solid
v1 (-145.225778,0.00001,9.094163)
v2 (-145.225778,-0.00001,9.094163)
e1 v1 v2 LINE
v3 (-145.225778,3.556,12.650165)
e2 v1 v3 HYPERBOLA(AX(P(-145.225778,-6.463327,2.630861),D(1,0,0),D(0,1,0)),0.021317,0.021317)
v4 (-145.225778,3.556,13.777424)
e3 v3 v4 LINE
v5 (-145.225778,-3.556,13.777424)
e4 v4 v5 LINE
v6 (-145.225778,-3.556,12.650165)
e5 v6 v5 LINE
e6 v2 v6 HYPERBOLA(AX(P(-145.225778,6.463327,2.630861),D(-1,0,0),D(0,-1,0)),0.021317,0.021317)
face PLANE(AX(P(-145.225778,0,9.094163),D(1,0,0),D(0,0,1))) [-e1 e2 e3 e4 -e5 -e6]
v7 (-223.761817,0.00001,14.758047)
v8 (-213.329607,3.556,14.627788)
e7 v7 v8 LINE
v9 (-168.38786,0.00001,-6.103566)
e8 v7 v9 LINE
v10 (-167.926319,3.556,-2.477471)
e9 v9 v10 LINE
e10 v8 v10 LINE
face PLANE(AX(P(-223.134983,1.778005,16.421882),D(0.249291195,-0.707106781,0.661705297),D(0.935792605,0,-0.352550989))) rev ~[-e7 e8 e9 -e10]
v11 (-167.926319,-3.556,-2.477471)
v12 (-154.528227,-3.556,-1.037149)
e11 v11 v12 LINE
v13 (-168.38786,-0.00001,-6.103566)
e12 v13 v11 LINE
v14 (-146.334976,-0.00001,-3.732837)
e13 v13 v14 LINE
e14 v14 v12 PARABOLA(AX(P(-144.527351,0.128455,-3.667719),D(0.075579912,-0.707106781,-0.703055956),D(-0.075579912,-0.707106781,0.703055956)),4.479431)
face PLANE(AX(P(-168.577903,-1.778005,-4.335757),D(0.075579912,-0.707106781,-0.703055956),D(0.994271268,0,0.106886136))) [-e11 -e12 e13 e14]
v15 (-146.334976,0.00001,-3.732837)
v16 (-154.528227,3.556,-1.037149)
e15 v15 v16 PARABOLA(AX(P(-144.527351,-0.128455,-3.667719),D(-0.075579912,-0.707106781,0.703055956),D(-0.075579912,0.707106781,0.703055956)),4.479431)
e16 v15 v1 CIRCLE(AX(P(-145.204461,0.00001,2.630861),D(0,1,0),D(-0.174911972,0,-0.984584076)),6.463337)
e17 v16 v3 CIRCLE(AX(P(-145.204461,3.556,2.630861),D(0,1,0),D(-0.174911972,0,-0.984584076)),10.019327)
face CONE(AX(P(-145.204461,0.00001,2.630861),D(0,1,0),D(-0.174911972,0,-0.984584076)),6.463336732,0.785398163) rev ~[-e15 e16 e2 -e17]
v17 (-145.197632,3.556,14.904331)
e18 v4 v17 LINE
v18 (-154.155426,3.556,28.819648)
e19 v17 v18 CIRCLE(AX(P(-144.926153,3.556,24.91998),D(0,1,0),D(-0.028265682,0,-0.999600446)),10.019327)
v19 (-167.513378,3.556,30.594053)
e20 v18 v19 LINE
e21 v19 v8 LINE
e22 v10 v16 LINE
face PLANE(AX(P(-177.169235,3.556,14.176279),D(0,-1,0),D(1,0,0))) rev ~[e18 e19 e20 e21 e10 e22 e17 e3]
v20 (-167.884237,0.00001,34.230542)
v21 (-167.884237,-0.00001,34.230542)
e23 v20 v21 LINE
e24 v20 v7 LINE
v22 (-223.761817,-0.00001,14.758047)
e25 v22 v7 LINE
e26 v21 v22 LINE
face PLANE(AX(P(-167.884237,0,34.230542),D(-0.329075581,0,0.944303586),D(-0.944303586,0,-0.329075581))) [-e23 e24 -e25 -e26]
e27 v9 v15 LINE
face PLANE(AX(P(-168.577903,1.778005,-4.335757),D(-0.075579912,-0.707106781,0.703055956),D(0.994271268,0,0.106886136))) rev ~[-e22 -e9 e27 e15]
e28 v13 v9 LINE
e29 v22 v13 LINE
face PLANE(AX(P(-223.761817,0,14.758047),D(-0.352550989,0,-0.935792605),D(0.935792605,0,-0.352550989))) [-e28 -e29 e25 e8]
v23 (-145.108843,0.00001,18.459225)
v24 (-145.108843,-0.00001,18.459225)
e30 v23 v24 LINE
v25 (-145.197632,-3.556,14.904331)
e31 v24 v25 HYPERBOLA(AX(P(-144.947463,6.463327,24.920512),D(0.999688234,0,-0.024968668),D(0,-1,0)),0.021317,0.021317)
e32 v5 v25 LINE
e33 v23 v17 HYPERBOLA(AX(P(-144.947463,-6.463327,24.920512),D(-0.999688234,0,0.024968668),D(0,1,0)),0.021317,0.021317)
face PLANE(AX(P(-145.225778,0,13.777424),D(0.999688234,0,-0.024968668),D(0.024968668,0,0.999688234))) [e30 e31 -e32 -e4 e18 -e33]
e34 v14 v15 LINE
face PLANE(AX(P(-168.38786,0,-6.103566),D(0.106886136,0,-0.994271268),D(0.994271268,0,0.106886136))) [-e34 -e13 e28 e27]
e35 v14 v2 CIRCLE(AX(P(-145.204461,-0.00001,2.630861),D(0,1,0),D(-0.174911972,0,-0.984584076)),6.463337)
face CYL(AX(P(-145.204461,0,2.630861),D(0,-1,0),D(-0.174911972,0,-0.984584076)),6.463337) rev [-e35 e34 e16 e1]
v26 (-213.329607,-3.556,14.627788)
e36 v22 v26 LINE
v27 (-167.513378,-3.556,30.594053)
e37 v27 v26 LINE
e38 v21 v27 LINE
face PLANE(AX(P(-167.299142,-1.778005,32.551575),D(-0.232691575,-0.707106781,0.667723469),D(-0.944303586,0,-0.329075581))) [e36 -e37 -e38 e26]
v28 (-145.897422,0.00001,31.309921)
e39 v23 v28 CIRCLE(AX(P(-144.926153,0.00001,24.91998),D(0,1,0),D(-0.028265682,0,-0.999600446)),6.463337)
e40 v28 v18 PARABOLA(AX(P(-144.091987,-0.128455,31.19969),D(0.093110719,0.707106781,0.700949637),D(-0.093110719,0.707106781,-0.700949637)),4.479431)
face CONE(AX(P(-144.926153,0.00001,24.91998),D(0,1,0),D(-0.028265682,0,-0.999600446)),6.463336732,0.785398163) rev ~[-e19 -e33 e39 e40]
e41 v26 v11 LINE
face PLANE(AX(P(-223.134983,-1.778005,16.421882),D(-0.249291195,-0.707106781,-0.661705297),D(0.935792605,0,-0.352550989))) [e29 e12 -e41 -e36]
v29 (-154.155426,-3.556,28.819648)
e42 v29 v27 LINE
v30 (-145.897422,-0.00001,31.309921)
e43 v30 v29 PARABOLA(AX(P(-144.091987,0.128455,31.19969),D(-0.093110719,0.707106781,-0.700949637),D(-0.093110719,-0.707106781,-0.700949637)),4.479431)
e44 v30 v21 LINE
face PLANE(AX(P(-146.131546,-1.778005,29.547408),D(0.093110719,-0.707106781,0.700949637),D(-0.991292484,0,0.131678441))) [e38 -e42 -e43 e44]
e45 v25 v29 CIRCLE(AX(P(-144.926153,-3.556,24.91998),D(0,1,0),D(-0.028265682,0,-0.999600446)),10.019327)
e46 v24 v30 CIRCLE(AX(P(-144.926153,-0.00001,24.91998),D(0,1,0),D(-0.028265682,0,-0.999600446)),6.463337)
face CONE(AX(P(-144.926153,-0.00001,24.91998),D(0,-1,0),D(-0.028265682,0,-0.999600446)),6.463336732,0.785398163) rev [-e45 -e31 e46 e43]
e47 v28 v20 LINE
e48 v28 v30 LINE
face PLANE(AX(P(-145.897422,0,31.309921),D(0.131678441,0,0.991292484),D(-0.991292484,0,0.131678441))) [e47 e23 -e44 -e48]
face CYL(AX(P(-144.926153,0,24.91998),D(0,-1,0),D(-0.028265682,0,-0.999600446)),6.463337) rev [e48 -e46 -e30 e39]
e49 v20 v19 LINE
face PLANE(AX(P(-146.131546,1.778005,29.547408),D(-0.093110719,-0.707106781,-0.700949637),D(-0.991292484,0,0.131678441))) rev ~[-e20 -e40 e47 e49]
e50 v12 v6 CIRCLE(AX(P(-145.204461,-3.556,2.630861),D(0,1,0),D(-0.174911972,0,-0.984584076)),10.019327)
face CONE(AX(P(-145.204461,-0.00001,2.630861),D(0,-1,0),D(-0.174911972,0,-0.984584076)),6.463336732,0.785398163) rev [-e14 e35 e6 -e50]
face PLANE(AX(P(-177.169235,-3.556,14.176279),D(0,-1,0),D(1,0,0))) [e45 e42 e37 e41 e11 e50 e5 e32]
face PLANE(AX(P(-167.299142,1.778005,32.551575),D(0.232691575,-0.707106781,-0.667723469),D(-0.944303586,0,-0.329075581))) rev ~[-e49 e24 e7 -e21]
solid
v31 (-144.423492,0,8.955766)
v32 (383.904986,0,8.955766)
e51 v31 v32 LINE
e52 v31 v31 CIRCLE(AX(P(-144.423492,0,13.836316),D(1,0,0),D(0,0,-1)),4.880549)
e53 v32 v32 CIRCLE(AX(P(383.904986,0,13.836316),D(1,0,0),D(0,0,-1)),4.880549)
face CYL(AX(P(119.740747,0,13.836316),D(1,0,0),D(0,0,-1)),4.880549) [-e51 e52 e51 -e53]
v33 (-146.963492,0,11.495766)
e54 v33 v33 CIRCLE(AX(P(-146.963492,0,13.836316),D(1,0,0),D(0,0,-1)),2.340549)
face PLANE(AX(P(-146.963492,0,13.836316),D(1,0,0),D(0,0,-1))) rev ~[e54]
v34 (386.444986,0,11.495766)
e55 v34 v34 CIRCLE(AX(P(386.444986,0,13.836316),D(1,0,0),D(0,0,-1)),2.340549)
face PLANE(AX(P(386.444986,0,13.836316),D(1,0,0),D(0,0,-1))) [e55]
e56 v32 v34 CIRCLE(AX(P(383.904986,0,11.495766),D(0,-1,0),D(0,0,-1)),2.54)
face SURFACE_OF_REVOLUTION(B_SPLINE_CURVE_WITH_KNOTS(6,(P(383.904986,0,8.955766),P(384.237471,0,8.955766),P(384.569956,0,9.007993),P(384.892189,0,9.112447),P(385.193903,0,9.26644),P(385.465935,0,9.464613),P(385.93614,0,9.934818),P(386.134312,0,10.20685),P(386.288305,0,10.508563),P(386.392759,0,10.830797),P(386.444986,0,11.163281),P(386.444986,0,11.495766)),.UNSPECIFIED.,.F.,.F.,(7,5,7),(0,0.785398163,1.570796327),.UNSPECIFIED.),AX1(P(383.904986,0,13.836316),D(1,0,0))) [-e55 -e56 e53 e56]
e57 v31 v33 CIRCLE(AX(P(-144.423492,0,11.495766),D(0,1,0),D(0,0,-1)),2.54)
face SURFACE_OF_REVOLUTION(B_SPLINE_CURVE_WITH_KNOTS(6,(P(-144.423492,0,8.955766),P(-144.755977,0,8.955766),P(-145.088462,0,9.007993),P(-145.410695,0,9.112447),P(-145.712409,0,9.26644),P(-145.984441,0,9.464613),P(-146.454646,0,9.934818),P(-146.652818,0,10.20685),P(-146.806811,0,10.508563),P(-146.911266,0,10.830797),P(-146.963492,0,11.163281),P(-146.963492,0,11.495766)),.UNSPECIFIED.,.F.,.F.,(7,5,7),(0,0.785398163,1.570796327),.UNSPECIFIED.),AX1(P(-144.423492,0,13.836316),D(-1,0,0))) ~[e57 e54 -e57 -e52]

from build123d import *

# Parameters (mm, degrees)
F0_W     = 533.4084779024
F0_H     = 4.8805493861
F3_R     = 2.54
F4_DEPTH = 3.556
F5_SIZE  = 3.55599
F6_R     = 2.54


# Not quite as in the source:
# - a fillet or chamfer is up to 0.001 mm smaller than in the source, because OpenCascade refuses the exact size
# - a feature names something its author has since deleted; it is built from what else it names


with BuildPart() as f1:
    # F0 (on Front) → F1 (revolve)
    with BuildSketch(Plane.XZ):
        with Locations((119.7407469153, 11.39604114)):
            Rectangle(F0_W, F0_H)
    revolve(axis=Axis((119.7407469153, 0, 13.836315833), (1, 0, 0)))

    # F3
    f3_edges = [f1.edges().sort_by_distance(p)[0] for p in [
        (386.444986, 0, 18.716865),
    ]]
    fillet(f3_edges, radius=F3_R)

    # F6
    f6_edges = [f1.edges().sort_by_distance(p)[0] for p in [
        (-146.963492, 0, 18.716865),
    ]]
    fillet(f6_edges, radius=F6_R)


with BuildPart() as f4:
    # F2 (on Front) → F4 (new body, symmetric)
    with BuildSketch(Plane.XZ):
        with BuildLine():
            ThreePointArc((-146.3349759579, -3.7328371559), (-151.6437669731, 3.1876916726), (-145.2257782221, 9.0941628441))
            Line((-145.2257782221, 9.0941628441), (-145.2257782221, 13.7774241157))
            Line((-145.2257782221, 13.7774241157), (-145.1088434278, 18.4592253066))
            ThreePointArc((-145.1088434278, 18.4592253066), (-151.3773545538, 24.5241036708), (-145.8974222536, 31.3099214766))
            Line((-145.8974222536, 31.3099214766), (-167.8842370803, 34.2305423366))
            Line((-167.8842370803, 34.2305423366), (-223.7618170531, 14.7580471046))
            Line((-223.7618170531, 14.7580471046), (-168.3878600597, -6.1035659938))
            Line((-168.3878600597, -6.1035659938), (-146.3349759579, -3.7328371559))
        make_face()
    extrude(amount=F4_DEPTH, both=True)

    # F5 (size 3.556 in the source; OpenCascade refuses exactly that, so slightly less here)
    f5_edges = [f4.edges().sort_by_distance(p)[0] for p in [
        (-157.361418, 3.556, -4.918202),
        (-196.074839, 3.556, 4.327241),
        (-157.361418, -3.556, -4.918202),
        (-196.074839, -3.556, 4.327241),
        (-151.643767, -3.556, 3.187692),
        (-151.643767, 3.556, 3.187692),
        (-151.377355, -3.556, 24.524104),
        (-156.89083, -3.556, 32.770232),
        (-195.823027, -3.556, 24.494295),
        (-151.377355, 3.556, 24.524104),
        (-195.823027, 3.556, 24.494295),
        (-156.89083, 3.556, 32.770232),
    ]]
    chamfer(f5_edges, length=F5_SIZE)


solid = Compound([f1.part, f4.part])
